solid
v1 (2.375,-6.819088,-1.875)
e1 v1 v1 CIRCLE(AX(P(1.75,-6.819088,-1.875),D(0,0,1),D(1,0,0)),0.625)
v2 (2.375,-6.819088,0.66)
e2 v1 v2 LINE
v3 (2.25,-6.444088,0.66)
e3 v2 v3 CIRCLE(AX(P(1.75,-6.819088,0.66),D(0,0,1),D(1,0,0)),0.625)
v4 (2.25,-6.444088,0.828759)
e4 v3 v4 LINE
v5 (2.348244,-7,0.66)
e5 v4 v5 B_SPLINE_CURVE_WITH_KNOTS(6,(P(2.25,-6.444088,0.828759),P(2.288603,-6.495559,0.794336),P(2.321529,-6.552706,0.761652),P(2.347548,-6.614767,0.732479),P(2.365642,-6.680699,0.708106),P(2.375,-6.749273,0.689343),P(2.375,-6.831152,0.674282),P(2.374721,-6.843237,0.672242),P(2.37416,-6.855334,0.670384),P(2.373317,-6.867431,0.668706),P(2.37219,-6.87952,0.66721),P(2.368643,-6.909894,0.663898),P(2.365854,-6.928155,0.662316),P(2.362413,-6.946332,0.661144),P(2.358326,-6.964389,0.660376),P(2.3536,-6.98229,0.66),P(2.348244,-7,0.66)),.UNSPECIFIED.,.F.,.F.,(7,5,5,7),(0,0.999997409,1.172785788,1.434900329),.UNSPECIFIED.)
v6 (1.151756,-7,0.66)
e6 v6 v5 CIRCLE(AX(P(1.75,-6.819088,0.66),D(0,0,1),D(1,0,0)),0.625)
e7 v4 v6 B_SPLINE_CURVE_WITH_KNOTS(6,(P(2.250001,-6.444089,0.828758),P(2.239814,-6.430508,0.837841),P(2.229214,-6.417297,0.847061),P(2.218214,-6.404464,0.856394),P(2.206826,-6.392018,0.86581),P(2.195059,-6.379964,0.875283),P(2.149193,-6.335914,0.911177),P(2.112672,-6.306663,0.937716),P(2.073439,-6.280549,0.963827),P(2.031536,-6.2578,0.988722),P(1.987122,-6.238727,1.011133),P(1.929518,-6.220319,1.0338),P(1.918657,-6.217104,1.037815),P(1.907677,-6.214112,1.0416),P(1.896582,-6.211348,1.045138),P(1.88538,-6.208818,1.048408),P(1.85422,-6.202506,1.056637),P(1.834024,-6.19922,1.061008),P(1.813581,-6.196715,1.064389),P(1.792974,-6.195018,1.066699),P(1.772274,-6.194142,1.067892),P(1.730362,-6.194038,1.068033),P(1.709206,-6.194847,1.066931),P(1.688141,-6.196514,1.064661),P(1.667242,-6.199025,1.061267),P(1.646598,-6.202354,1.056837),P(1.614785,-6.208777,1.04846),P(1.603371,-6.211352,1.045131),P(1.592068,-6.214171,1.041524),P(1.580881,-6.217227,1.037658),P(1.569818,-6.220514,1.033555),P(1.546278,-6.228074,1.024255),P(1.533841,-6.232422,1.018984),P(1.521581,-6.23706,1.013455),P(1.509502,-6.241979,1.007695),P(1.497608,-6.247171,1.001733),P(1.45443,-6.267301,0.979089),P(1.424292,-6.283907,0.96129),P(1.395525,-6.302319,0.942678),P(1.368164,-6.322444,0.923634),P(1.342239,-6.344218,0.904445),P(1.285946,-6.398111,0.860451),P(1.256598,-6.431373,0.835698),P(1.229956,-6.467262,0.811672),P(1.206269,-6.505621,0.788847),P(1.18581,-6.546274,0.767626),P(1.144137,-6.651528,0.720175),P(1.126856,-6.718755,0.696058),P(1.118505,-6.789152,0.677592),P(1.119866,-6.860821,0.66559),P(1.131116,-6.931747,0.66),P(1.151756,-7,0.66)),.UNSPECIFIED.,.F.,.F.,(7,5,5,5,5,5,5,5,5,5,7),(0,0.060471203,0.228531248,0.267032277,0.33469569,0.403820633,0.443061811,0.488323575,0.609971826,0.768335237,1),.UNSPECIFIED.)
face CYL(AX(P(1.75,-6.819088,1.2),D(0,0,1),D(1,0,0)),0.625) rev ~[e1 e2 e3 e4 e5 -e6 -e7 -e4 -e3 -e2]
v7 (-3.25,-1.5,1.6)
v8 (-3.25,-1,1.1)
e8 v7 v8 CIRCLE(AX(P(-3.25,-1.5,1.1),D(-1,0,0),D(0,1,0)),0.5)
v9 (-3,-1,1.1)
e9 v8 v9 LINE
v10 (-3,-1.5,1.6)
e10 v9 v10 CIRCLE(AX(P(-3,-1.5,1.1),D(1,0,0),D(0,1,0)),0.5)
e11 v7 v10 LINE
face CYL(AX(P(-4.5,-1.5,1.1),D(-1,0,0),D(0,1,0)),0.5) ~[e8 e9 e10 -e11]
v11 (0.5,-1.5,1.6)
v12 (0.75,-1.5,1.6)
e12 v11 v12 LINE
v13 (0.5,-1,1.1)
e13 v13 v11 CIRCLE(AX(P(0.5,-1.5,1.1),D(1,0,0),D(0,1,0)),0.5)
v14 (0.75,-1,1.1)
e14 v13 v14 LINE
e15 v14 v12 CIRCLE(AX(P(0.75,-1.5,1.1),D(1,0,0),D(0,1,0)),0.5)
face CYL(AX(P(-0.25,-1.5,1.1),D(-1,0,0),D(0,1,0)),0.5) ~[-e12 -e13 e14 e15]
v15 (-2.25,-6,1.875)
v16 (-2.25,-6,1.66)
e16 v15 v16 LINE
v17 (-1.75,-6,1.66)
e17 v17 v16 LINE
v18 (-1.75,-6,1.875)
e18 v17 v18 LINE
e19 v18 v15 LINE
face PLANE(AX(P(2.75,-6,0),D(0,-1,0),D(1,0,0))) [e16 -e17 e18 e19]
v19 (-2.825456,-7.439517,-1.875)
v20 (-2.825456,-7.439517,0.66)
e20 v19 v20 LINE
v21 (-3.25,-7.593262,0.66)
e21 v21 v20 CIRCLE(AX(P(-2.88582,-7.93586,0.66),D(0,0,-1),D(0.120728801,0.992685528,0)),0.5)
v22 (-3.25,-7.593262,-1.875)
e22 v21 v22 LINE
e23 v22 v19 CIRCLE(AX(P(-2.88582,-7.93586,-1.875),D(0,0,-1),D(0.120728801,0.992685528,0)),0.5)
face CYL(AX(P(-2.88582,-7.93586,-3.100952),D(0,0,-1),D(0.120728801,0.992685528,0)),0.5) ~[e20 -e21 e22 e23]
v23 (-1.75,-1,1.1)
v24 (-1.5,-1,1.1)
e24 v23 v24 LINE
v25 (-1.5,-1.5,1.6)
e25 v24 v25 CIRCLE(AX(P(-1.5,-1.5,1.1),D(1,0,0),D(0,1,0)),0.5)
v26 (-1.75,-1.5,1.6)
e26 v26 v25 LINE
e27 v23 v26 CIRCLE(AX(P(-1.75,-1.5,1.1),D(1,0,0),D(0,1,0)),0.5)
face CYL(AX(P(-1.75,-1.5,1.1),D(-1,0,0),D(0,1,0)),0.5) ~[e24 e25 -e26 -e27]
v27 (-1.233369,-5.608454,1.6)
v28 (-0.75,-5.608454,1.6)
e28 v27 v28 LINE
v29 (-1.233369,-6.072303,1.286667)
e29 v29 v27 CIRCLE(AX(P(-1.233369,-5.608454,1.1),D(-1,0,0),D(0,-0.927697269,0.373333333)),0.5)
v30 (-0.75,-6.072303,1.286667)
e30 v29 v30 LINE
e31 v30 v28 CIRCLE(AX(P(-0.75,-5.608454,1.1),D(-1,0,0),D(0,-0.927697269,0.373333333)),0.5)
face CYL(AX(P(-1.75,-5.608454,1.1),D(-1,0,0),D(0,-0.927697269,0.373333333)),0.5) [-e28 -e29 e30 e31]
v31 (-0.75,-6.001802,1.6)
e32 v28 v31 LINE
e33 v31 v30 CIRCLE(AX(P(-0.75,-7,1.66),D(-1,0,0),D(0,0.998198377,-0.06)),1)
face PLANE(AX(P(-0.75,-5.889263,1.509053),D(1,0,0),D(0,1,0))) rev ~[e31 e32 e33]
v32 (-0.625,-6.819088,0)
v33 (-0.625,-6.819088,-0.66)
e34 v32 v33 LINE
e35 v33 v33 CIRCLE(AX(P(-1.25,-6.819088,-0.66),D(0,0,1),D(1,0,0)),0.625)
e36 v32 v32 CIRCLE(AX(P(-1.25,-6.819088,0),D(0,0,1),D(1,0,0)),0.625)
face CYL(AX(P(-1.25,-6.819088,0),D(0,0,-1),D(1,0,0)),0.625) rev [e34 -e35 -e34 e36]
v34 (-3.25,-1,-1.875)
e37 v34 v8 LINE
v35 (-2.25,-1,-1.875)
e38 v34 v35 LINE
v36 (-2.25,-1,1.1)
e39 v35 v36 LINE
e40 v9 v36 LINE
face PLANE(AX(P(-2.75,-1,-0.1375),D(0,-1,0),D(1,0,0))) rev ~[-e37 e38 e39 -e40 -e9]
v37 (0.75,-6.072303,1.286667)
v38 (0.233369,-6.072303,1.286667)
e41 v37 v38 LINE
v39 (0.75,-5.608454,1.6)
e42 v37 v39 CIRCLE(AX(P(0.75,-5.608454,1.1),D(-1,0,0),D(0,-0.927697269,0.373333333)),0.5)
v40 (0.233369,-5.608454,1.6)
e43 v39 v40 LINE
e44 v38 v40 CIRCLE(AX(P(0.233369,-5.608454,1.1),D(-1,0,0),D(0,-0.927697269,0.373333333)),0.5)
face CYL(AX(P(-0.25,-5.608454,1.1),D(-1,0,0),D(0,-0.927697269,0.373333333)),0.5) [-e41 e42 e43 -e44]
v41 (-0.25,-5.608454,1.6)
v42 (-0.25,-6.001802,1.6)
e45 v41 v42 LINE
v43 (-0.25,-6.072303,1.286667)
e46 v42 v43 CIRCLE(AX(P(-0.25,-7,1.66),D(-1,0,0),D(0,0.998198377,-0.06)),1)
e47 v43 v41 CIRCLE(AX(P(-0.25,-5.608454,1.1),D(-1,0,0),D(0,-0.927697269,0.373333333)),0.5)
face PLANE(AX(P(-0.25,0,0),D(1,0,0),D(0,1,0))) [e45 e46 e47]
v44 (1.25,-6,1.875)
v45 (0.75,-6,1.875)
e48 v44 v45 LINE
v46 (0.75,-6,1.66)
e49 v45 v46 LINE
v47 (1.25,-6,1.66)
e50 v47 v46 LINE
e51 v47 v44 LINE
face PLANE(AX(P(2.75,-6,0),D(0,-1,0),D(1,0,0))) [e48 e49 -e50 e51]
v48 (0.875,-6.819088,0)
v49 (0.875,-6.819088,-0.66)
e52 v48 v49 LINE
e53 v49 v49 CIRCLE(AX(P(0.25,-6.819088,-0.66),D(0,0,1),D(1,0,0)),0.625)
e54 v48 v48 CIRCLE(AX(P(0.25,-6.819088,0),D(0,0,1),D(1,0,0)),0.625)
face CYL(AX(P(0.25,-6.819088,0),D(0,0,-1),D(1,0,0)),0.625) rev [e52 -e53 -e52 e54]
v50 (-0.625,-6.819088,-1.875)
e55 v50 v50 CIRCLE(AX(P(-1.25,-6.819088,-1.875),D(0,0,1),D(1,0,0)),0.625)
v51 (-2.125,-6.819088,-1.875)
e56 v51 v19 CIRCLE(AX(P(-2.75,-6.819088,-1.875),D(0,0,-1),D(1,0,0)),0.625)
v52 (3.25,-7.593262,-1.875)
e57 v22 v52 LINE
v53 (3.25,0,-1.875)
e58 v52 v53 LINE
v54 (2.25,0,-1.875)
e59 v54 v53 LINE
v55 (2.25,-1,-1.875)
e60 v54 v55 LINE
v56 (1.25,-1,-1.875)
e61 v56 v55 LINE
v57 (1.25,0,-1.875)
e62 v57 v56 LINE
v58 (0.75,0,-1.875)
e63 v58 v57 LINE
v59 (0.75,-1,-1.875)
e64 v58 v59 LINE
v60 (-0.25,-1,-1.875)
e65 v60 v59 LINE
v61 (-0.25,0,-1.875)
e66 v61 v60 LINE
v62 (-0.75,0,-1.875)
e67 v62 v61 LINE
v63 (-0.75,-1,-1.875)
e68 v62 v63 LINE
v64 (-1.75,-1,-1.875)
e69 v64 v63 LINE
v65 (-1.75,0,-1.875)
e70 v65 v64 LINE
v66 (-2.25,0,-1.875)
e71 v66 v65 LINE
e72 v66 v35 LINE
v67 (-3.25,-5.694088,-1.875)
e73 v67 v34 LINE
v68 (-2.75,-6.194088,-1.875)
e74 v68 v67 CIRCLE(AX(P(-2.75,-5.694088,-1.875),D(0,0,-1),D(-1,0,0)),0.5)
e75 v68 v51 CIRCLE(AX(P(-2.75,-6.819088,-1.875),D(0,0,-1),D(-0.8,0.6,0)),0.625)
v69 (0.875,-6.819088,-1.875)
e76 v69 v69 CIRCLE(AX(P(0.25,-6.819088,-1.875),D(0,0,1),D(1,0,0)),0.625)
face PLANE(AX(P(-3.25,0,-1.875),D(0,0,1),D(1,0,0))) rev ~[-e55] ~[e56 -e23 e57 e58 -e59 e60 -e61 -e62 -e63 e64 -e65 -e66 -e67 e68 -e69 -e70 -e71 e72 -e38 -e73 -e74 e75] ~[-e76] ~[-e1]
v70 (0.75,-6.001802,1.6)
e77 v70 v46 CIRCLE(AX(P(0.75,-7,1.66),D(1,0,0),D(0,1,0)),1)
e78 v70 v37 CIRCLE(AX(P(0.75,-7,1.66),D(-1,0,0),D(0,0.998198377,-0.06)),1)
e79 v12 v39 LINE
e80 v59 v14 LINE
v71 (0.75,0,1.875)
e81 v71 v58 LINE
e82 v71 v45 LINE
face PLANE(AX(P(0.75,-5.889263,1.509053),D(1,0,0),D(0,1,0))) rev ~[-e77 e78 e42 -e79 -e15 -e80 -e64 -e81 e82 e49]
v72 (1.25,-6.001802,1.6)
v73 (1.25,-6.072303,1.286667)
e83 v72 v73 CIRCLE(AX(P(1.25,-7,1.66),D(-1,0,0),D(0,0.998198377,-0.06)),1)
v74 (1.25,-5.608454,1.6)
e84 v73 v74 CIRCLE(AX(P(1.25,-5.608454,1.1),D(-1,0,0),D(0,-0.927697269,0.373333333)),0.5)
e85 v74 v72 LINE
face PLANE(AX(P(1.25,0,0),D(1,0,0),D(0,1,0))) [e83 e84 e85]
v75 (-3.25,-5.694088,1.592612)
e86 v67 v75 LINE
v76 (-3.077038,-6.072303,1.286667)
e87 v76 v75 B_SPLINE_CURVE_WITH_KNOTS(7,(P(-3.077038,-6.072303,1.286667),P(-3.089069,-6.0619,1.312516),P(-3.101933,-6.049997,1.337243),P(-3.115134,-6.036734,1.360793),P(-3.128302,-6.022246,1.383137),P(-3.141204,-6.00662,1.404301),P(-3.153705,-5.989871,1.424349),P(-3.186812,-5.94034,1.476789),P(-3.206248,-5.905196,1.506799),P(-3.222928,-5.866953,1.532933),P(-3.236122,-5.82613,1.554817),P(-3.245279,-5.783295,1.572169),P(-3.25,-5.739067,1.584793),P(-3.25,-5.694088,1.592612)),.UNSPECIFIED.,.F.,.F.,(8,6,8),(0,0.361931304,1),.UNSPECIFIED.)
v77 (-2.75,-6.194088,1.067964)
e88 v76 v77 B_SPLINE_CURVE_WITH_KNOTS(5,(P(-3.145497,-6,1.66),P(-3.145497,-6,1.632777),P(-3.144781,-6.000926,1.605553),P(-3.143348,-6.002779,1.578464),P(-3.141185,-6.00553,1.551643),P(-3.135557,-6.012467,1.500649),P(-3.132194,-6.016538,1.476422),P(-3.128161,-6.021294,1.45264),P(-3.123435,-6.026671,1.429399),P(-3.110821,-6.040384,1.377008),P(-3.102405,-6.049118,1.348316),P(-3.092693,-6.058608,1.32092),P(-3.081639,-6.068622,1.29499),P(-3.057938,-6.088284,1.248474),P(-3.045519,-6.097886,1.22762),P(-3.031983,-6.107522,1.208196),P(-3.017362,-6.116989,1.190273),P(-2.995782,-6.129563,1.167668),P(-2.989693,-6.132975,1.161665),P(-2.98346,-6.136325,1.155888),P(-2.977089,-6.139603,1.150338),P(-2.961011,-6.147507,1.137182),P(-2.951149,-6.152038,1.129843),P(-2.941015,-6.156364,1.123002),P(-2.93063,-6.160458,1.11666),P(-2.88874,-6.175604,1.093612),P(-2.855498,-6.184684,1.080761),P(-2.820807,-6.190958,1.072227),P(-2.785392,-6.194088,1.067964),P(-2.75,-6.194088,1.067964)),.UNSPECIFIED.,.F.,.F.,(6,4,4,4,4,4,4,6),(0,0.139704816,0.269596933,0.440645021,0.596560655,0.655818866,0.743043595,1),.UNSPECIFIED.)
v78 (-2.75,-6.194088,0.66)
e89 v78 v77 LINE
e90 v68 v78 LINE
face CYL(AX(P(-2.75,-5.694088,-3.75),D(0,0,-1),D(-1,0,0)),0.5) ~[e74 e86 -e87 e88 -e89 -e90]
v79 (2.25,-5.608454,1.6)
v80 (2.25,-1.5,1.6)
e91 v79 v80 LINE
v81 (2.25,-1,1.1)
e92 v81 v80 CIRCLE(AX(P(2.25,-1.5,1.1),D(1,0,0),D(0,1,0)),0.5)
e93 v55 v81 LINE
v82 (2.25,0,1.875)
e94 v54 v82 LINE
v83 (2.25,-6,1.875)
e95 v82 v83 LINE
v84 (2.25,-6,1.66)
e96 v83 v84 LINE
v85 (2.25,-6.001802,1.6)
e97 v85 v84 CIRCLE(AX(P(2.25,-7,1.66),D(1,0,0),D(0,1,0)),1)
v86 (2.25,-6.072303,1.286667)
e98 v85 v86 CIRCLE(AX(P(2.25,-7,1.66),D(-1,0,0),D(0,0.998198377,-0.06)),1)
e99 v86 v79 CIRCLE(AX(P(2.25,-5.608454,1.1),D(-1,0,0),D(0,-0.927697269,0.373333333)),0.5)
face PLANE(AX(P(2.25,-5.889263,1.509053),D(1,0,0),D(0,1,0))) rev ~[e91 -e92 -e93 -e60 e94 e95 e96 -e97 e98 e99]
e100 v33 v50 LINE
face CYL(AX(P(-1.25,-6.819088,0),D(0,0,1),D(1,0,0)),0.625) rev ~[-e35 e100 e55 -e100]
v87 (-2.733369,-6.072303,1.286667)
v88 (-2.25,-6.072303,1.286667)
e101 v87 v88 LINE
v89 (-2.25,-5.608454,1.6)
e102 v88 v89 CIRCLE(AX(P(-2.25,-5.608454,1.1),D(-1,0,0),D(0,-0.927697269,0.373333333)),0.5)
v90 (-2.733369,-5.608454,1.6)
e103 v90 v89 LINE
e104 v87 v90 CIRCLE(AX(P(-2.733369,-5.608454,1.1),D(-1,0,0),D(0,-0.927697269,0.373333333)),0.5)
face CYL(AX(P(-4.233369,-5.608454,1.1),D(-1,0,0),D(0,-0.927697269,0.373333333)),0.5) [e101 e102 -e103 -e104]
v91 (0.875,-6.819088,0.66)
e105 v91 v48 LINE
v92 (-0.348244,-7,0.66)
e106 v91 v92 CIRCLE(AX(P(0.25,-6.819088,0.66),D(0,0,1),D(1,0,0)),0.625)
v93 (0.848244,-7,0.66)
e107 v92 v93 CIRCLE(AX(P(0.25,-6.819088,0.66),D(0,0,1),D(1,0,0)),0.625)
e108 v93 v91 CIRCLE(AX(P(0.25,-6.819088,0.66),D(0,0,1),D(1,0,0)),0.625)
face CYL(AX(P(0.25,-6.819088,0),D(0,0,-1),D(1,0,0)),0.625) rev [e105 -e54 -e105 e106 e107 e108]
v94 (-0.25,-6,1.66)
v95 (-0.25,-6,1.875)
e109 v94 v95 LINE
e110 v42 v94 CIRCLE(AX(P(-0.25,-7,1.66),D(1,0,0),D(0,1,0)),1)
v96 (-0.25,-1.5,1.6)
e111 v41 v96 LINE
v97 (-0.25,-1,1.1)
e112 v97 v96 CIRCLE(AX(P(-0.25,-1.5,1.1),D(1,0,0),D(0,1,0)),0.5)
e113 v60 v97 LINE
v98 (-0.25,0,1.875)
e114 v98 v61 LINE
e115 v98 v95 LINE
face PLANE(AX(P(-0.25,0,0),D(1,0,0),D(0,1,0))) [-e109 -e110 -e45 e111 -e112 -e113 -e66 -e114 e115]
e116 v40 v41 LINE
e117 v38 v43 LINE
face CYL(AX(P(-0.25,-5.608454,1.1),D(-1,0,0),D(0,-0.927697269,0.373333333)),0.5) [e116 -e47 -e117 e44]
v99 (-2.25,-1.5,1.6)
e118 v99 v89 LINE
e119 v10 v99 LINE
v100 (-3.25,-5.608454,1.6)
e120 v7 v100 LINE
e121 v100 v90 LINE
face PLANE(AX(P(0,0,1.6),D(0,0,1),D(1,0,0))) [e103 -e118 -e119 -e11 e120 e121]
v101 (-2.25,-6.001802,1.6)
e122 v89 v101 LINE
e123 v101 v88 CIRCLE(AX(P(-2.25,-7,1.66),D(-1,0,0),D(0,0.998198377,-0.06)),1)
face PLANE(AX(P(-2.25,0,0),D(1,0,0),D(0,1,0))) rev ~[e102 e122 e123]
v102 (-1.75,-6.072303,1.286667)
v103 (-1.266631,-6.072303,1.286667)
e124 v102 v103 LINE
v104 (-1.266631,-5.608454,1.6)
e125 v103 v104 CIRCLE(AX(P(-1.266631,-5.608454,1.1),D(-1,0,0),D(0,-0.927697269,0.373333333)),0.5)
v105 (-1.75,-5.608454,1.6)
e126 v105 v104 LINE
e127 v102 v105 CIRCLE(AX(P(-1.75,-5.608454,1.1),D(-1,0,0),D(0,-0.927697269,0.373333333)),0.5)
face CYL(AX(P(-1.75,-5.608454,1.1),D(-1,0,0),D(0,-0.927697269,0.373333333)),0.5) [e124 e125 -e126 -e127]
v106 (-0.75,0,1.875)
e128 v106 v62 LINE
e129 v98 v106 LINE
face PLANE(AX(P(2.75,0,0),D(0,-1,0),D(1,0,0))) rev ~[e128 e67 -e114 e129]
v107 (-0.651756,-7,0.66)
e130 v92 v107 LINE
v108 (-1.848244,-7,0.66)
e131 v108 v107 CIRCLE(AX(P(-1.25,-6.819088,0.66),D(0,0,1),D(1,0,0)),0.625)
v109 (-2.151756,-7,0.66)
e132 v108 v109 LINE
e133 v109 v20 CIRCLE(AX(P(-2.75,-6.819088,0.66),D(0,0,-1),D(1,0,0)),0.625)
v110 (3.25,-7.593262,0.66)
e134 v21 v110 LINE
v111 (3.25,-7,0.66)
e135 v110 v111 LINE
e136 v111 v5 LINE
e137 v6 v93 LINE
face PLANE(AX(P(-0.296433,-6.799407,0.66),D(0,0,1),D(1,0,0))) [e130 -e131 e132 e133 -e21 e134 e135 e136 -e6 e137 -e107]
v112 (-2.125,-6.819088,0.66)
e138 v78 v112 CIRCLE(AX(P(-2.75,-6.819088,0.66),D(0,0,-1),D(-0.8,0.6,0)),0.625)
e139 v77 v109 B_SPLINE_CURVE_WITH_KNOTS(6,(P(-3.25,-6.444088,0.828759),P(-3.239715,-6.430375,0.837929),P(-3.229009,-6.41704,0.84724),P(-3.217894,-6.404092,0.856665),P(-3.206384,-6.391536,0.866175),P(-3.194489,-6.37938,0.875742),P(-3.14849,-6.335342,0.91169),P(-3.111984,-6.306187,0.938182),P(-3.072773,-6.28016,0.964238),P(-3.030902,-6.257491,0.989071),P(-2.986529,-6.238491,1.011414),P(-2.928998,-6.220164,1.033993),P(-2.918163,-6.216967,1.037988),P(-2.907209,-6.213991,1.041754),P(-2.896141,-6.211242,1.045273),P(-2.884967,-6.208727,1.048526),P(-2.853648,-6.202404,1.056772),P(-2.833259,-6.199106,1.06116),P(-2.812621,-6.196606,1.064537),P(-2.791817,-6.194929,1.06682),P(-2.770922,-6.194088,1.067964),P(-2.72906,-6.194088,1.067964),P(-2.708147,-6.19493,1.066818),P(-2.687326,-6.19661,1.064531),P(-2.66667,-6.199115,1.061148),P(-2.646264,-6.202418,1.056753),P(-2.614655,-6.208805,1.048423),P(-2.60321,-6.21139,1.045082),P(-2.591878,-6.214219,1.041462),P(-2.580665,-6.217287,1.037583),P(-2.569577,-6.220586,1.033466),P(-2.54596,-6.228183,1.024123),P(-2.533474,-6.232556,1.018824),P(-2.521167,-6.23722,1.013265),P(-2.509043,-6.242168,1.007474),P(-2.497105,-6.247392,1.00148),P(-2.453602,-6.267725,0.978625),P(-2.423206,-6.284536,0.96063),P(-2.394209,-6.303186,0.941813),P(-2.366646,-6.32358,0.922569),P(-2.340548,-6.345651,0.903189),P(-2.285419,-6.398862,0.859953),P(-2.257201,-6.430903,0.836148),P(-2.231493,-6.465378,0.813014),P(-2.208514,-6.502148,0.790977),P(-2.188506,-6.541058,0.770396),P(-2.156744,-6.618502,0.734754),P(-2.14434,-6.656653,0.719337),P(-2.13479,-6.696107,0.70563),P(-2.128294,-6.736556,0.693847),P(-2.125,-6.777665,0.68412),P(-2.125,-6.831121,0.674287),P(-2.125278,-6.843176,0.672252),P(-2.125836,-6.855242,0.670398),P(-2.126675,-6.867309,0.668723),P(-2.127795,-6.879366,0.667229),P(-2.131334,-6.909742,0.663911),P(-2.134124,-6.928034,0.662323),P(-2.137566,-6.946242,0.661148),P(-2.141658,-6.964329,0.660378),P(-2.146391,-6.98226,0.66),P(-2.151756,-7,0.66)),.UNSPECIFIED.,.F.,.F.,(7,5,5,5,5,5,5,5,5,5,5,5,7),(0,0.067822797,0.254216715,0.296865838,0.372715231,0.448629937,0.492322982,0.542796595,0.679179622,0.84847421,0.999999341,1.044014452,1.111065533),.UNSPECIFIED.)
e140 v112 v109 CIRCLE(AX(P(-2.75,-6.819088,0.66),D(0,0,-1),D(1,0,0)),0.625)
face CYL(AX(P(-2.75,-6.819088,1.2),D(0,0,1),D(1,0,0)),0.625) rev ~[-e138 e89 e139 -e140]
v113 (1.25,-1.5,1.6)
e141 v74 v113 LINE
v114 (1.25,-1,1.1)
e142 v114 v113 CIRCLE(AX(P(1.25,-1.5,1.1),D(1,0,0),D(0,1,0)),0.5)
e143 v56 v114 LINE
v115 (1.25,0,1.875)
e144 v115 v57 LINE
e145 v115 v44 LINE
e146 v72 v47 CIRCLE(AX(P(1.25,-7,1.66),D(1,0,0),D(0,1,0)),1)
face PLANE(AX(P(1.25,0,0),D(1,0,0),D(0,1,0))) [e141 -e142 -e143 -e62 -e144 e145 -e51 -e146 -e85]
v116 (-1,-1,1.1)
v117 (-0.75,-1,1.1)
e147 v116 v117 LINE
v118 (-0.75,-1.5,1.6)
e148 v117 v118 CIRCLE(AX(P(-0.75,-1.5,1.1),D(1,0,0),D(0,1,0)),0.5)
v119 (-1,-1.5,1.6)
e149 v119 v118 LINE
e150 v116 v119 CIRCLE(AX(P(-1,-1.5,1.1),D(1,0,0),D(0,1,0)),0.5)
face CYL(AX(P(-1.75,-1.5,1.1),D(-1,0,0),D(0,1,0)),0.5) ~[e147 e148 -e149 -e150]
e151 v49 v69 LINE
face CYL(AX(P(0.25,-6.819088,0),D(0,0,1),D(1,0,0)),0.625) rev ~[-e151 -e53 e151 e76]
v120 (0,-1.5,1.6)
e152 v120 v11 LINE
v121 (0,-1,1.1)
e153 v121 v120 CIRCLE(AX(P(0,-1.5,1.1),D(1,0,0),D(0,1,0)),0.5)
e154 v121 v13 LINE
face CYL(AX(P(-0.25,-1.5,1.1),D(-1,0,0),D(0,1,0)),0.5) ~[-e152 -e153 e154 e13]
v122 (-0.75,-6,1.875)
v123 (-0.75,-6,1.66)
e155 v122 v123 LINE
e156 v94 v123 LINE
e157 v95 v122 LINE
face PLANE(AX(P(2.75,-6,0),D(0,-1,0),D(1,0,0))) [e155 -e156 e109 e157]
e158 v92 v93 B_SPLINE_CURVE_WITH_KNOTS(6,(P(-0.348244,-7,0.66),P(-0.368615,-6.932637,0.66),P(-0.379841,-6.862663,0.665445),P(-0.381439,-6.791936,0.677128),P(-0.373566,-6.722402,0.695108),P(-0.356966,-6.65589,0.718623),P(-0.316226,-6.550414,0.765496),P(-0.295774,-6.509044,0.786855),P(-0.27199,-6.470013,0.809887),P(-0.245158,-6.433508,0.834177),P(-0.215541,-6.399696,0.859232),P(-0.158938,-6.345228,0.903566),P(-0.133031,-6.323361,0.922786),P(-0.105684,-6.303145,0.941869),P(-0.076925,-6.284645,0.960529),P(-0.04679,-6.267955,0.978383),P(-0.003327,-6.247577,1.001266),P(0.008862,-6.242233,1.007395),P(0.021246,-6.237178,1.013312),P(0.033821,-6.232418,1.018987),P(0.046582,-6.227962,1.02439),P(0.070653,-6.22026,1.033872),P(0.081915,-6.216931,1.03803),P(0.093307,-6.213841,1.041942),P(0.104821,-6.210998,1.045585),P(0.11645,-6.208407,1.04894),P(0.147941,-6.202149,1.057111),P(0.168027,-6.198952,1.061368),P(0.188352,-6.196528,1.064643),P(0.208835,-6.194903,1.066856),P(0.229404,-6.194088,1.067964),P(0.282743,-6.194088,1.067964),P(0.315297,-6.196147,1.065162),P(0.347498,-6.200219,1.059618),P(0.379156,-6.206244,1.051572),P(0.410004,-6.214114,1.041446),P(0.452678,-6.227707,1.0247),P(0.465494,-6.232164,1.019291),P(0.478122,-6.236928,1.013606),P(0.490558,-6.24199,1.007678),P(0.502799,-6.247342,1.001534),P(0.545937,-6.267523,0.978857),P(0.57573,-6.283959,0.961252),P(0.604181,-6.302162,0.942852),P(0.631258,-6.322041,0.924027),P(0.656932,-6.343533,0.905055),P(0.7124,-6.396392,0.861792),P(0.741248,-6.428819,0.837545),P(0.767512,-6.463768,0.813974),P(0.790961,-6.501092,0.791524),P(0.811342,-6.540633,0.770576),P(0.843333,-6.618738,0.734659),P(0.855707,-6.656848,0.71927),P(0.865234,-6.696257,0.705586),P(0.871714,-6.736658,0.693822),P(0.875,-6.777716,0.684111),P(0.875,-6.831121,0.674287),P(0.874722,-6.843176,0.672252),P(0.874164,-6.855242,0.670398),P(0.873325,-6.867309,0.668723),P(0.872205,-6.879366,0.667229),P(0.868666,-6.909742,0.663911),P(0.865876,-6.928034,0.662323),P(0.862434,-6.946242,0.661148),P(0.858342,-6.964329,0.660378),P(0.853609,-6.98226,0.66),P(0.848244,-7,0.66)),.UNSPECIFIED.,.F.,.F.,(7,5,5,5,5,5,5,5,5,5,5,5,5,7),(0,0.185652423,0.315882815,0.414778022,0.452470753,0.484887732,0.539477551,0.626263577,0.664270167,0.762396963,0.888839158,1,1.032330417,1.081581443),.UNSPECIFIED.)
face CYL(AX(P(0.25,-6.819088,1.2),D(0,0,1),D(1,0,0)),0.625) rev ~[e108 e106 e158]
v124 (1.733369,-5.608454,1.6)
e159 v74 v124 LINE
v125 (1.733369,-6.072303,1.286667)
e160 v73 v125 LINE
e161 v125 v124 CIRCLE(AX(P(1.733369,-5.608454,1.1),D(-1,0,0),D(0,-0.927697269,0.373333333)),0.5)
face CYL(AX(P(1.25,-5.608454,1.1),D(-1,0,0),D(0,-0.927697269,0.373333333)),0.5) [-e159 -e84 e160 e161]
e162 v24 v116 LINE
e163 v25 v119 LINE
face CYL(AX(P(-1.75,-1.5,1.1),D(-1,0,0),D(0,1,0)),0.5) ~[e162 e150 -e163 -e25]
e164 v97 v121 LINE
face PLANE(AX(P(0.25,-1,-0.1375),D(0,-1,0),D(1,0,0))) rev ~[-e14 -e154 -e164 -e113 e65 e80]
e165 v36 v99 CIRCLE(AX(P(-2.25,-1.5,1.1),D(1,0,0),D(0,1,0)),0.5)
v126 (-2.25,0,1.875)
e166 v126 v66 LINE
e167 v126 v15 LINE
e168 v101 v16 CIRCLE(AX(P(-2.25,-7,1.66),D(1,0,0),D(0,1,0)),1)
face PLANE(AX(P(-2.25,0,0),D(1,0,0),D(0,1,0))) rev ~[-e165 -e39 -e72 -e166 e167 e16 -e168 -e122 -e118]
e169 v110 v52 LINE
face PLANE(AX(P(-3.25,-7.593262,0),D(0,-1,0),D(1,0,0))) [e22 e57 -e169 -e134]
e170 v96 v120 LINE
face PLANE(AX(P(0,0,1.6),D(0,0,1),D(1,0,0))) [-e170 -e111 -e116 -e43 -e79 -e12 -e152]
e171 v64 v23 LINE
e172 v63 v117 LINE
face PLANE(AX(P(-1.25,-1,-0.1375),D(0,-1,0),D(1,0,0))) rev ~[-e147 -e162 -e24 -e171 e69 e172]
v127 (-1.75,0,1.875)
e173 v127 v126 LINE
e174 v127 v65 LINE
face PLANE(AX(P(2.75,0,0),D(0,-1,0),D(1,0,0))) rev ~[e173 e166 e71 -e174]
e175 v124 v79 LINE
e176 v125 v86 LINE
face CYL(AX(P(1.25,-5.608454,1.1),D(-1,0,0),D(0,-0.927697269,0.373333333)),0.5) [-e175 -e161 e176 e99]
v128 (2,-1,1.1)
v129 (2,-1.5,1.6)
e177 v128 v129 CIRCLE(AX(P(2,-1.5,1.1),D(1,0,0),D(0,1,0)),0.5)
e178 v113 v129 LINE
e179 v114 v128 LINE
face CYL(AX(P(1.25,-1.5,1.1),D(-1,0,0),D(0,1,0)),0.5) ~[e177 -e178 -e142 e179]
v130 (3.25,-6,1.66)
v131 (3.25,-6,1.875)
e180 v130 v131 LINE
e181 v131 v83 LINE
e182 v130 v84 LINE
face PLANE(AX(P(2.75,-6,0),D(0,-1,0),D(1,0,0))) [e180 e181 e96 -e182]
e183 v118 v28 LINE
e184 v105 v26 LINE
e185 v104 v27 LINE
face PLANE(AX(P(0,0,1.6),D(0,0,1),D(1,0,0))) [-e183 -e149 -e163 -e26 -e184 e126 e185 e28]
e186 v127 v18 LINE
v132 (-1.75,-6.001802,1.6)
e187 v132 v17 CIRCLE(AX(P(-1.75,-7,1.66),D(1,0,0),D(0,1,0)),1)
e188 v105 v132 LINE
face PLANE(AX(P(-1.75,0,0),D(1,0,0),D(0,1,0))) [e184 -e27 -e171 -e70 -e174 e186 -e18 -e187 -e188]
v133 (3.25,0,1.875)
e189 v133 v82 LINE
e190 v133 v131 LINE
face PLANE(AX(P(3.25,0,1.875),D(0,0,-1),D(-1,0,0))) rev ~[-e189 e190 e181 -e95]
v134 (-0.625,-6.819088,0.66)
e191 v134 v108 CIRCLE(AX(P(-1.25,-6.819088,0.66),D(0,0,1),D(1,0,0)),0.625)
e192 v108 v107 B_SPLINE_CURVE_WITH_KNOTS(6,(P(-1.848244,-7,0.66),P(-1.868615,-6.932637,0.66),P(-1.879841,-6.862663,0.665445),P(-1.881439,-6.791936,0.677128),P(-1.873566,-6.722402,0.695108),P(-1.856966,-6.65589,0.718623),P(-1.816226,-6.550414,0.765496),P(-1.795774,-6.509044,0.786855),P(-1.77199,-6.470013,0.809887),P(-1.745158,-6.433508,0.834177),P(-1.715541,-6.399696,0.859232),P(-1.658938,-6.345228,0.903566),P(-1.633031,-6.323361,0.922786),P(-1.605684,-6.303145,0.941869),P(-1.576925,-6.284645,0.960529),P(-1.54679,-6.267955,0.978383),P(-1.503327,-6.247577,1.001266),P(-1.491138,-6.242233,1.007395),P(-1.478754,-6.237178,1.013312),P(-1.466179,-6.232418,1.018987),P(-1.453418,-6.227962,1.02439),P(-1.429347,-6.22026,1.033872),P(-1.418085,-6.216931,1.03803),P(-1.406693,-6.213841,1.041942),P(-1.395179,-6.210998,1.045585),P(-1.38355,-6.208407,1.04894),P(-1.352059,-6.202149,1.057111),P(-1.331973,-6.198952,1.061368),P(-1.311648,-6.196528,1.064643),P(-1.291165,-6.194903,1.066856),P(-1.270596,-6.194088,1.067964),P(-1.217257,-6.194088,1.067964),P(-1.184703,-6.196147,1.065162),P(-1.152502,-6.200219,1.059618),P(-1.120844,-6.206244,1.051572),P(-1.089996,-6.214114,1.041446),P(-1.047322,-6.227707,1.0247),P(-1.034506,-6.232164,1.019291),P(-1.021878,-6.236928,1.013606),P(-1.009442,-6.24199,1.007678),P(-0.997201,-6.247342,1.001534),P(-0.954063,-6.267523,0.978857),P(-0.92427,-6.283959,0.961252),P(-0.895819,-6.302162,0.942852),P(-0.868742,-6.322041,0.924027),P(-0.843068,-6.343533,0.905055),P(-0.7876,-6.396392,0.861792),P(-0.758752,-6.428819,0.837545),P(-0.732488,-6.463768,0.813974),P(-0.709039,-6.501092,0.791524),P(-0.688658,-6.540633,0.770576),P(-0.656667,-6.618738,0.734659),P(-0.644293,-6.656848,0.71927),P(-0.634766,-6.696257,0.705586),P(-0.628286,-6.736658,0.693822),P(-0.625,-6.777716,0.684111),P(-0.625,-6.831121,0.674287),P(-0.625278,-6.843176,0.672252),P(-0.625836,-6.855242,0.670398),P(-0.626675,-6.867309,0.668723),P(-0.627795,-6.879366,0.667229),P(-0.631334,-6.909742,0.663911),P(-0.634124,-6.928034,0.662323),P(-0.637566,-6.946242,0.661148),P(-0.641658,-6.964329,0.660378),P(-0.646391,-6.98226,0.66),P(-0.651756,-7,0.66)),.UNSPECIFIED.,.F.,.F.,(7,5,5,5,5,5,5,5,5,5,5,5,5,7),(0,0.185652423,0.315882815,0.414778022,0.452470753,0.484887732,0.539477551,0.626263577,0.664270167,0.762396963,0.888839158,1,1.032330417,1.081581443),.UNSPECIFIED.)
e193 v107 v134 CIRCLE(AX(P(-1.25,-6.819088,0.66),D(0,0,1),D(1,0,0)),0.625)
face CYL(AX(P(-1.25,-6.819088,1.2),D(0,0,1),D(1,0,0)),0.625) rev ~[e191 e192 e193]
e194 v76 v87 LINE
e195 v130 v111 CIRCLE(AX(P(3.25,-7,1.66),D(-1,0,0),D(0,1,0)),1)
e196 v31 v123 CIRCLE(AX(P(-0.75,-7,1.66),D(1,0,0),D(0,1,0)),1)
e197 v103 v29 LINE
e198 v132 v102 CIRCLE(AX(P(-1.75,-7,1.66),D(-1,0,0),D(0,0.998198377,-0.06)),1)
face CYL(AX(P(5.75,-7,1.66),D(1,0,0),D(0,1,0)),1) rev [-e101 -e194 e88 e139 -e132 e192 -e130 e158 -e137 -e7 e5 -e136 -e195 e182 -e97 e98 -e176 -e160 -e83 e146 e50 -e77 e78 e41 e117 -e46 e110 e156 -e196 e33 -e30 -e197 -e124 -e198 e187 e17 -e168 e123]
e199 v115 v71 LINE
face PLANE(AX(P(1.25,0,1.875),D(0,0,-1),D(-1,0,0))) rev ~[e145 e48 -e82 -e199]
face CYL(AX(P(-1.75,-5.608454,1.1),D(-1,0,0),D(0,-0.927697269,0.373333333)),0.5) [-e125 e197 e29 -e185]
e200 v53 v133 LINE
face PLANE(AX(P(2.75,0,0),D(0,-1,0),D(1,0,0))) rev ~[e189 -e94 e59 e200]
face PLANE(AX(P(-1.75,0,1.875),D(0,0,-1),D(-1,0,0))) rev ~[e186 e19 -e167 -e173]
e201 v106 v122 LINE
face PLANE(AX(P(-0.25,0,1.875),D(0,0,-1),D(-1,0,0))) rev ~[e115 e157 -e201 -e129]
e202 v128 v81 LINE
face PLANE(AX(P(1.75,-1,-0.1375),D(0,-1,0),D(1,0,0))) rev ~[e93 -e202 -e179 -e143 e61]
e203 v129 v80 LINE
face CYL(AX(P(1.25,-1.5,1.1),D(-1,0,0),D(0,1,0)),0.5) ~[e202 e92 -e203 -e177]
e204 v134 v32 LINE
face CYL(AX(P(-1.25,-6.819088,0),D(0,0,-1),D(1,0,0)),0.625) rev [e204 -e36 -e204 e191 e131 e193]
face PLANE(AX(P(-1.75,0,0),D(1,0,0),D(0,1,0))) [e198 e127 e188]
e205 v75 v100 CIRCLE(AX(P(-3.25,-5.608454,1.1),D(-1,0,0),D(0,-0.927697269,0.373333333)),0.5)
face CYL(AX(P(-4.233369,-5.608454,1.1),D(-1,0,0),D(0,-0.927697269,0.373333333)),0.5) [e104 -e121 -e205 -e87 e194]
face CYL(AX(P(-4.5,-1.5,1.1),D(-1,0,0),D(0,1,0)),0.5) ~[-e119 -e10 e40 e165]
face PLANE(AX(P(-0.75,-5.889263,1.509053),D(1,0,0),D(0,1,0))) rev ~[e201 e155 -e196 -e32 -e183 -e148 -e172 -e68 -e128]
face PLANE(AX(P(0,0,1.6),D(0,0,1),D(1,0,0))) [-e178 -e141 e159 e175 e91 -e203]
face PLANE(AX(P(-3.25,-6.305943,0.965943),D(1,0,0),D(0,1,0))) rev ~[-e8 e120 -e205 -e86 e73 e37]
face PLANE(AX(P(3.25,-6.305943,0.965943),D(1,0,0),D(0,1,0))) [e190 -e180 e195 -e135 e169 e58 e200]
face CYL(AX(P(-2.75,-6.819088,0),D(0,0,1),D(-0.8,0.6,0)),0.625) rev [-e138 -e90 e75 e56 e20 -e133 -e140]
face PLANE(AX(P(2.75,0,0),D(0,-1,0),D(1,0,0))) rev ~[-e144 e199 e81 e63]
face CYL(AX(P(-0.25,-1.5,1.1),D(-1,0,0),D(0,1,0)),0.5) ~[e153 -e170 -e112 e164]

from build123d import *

# Parameters (mm, degrees)
F0_W         = 1
F0_H         = 3.475
F1_DEPTH     = 6
F2_DEPTH     = 1
F3_R         = 0.625
F4_DEPTH     = 0.66
F5_DEPTH     = 1.875
F6_T4_DEPTH  = 9
F6_S6_R      = 0.625
F6_T7_DEPTH  = 6
F6_T11_DEPTH = 9
F6_S14_R     = 0.625
F6_T15_DEPTH = 6
F6_S16_R     = 0.625
F6_T17_DEPTH = 6
F6_S18_R     = 0.625
F6_T19_DEPTH = 6
F6_S20_R     = 0.625
F6_T21_DEPTH = 6
F6_T25_DEPTH = 11.5
F6_T32_DEPTH = 11.5
F6_T39_DEPTH = 11.5
F7_T1_DEPTH  = 6.4537585313
F7_T3_DEPTH  = 4.9869031288
F7_T5_DEPTH  = 1
F7_T7_DEPTH  = 1
F7_T9_DEPTH  = 1
F7_T11_DEPTH = 2.25
F7_T13_DEPTH = 1.9833688147
F7_T18_DEPTH = 3.5
F7_T23_DEPTH = 3.5
F7_T28_DEPTH = 3.5
F7_T33_DEPTH = 3.5
F7_T38_DEPTH = 3.5
F7_T43_DEPTH = 3.5
F7_T48_DEPTH = 2.9667376294
F7_T53_DEPTH = 2.9667376294
F7_T58_DEPTH = 2.9667376294
F7_T63_DEPTH = 2.9667376294
F7_T68_DEPTH = 2.9667376294
F7_T73_DEPTH = 2.9667376294


# Not quite as in the source:
# - a fillet or chamfer that OpenCascade refuses, or shapes differently, is made with other operations: its cross-section is extruded or revolved along the edge and cut away or added


with BuildPart() as f1:
    # F0 (on Front) → F1 (new body)
    with BuildSketch(Plane.XZ):
        Polygon((2.25, -1.875), (3.25, -1.875), (3.25, 1.875), (2.25, 1.875), (2.25, 1.6), align=None)
        with Locations((1.75, -0.1375)):
            Rectangle(F0_W, F0_H)
        Polygon((0.75, -1.875), (1.25, -1.875), (1.25, 1.6), (1.25, 1.875), (0.75, 1.875), (0.75, 1.6), align=None)
        with Locations((0.25, -0.1375)):
            Rectangle(F0_W, F0_H)
        Polygon((-0.75, -1.875), (-0.25, -1.875), (-0.25, 1.6), (-0.25, 1.875), (-0.75, 1.875), (-0.75, 1.6), align=None)
        with Locations((-1.25, -0.1375)):
            Rectangle(F0_W, F0_H)
        Polygon((-2.25, -1.875), (-1.75, -1.875), (-1.75, 1.6), (-1.75, 1.875), (-2.25, 1.875), (-2.25, 1.6), align=None)
        with Locations((-2.75, -0.1375)):
            Rectangle(F0_W, F0_H)
    extrude(amount=F1_DEPTH)

    # F0 (on Front) → F2 (cut)
    with BuildSketch(Plane.XZ):
        with Locations((1.75, -0.1375)):
            Rectangle(F0_W, F0_H)
        with Locations((0.25, -0.1375)):
            Rectangle(F0_W, F0_H)
        with Locations((-1.25, -0.1375)):
            Rectangle(F0_W, F0_H)
        with Locations((-2.75, -0.1375)):
            Rectangle(F0_W, F0_H)
    extrude(amount=F2_DEPTH, mode=Mode.SUBTRACT)

    # F3 (on Top) → F4 (join, symmetric)
    with BuildSketch(Plane.XY):
        with BuildLine():
            Line((3.25, -6), (-3.25, -6))
            Line((-3.25, -6), (-3.25, -6.4440884776))
            ThreePointArc((-3.25, -6.4440884776), (-2.5523576462, -6.2261614164), (-2.125, -6.8190884776))
            ThreePointArc((-2.125, -6.8190884776), (-2.5523576462, -7.4120155389), (-3.25, -7.1940884776))
            Line((-3.25, -7.1940884776), (-3.25, -7.593262475))
            Line((-3.25, -7.593262475), (3.25, -7.593262475))
            Line((3.25, -7.593262475), (3.25, -6))
        make_face()
        with Locations((-1.25, -6.8190884776)):
            Circle(F3_R, mode=Mode.SUBTRACT)
        with Locations((0.25, -6.8190884776)):
            Circle(F3_R, mode=Mode.SUBTRACT)
        with Locations((1.75, -6.8190884776)):
            Circle(F3_R, mode=Mode.SUBTRACT)
    extrude(amount=F4_DEPTH, both=True)

    # F3 (on Top) → F5 (join)
    with BuildSketch(Plane.XY):
        with BuildLine():
            Line((3.25, -6), (-3.25, -6))
            Line((-3.25, -6), (-3.25, -6.4440884776))
            ThreePointArc((-3.25, -6.4440884776), (-2.5523576462, -6.2261614164), (-2.125, -6.8190884776))
            ThreePointArc((-2.125, -6.8190884776), (-2.5523576462, -7.4120155389), (-3.25, -7.1940884776))
            Line((-3.25, -7.1940884776), (-3.25, -7.593262475))
            Line((-3.25, -7.593262475), (3.25, -7.593262475))
            Line((3.25, -7.593262475), (3.25, -6))
        make_face()
        with Locations((-1.25, -6.8190884776)):
            Circle(F3_R, mode=Mode.SUBTRACT)
        with Locations((0.25, -6.8190884776)):
            Circle(F3_R, mode=Mode.SUBTRACT)
        with Locations((1.75, -6.8190884776)):
            Circle(F3_R, mode=Mode.SUBTRACT)
    extrude(amount=-F5_DEPTH)

    # F6: fillet of radius 1 on 1 edges, made by hand


with BuildPart() as f6_tool2:
    # F6_s3 → F6_t4 (new body)
    with BuildSketch(Plane.YZ.offset(3.25)):
        with BuildLine():
            ThreePointArc((-6, 1.66), (-6.2928932188, 0.9528932188), (-7, 0.66))
            Line((-7, 0.66), (-6, 0.66))
            Line((-6, 0.66), (-6, 1.66))
        make_face()
    extrude(amount=-F6_T4_DEPTH)

    split(bisect_by=Plane.YZ.offset(2.25), keep=Keep.TOP)

    # F6_s6 → F6_t7 (cut, symmetric)
    with BuildSketch(Plane.XY.offset(1.2)):
        with Locations((1.75, -6.8190884776)):
            Circle(F6_S6_R)
    extrude(amount=F6_T7_DEPTH, both=True, mode=Mode.SUBTRACT)


with BuildPart() as f1_1:
    add(f1.part)

    # F6_t1: union F6_tool2
    add(f6_tool2.part)


with BuildPart() as f6_tool9:
    # F6_s10 → F6_t11 (new body)
    with BuildSketch(Plane.YZ.offset(5.75)):
        with BuildLine():
            ThreePointArc((-6, 1.66), (-6.2928932188, 0.9528932188), (-7, 0.66))
            Line((-7, 0.66), (-6, 0.66))
            Line((-6, 0.66), (-6, 1.66))
        make_face()
    extrude(amount=-F6_T11_DEPTH)

    split(bisect_by=Plane.YZ.offset(2.25), keep=Keep.BOTTOM)

    split(bisect_by=Plane.XY.offset(1.6), keep=Keep.BOTTOM)

    # F6_s14 → F6_t15 (cut, symmetric)
    with BuildSketch(Plane.XY.offset(1.2)):
        with Locations((-2.75, -6.8190884776)):
            Circle(F6_S14_R)
    extrude(amount=F6_T15_DEPTH, both=True, mode=Mode.SUBTRACT)

    # F6_s16 → F6_t17 (cut, symmetric)
    with BuildSketch(Plane.XY.offset(1.2)):
        with Locations((1.75, -6.8190884776)):
            Circle(F6_S16_R)
    extrude(amount=F6_T17_DEPTH, both=True, mode=Mode.SUBTRACT)

    # F6_s18 → F6_t19 (cut, symmetric)
    with BuildSketch(Plane.XY.offset(1.2)):
        with Locations((0.25, -6.8190884776)):
            Circle(F6_S18_R)
    extrude(amount=F6_T19_DEPTH, both=True, mode=Mode.SUBTRACT)

    # F6_s20 → F6_t21 (cut, symmetric)
    with BuildSketch(Plane.XY.offset(1.2)):
        with Locations((-1.25, -6.8190884776)):
            Circle(F6_S20_R)
    extrude(amount=F6_T21_DEPTH, both=True, mode=Mode.SUBTRACT)


with BuildPart() as f1_2:
    add(f1_1.part)

    # F6_t8: union F6_tool9
    add(f6_tool9.part)


with BuildPart() as f6_tool23:
    # F6_s24 → F6_t25 (new body)
    with BuildSketch(Plane.YZ.offset(5.75)):
        with BuildLine():
            ThreePointArc((-6, 1.66), (-6.2928932188, 0.9528932188), (-7, 0.66))
            Line((-7, 0.66), (-6, 0.66))
            Line((-6, 0.66), (-6, 1.66))
        make_face()
    extrude(amount=-F6_T25_DEPTH)

    split(bisect_by=Plane.XY.offset(1.6), keep=Keep.TOP)

    split(bisect_by=Plane.YZ.offset(1.25), keep=Keep.BOTTOM)

    split(bisect_by=Plane.YZ.offset(0.75), keep=Keep.TOP)


with BuildPart() as f1_3:
    add(f1_2.part)

    # F6_t22: union F6_tool23
    add(f6_tool23.part)


with BuildPart() as f6_tool30:
    # F6_s31 → F6_t32 (new body)
    with BuildSketch(Plane.YZ.offset(5.75)):
        with BuildLine():
            ThreePointArc((-6, 1.66), (-6.2928932188, 0.9528932188), (-7, 0.66))
            Line((-7, 0.66), (-6, 0.66))
            Line((-6, 0.66), (-6, 1.66))
        make_face()
    extrude(amount=-F6_T32_DEPTH)

    split(bisect_by=Plane.XY.offset(1.6), keep=Keep.TOP)

    split(bisect_by=Plane.YZ.offset(-0.25), keep=Keep.BOTTOM)

    split(bisect_by=Plane.YZ.offset(-0.75), keep=Keep.TOP)


with BuildPart() as f1_4:
    add(f1_3.part)

    # F6_t29: union F6_tool30
    add(f6_tool30.part)


with BuildPart() as f6_tool37:
    # F6_s38 → F6_t39 (new body)
    with BuildSketch(Plane.YZ.offset(5.75)):
        with BuildLine():
            ThreePointArc((-6, 1.66), (-6.2928932188, 0.9528932188), (-7, 0.66))
            Line((-7, 0.66), (-6, 0.66))
            Line((-6, 0.66), (-6, 1.66))
        make_face()
    extrude(amount=-F6_T39_DEPTH)

    split(bisect_by=Plane.XY.offset(1.6), keep=Keep.TOP)

    split(bisect_by=Plane.YZ.offset(-1.75), keep=Keep.BOTTOM)

    split(bisect_by=Plane.YZ.offset(-2.25), keep=Keep.TOP)


with BuildPart() as f1_5:
    add(f1_4.part)

    # F6_t36: union F6_tool37
    add(f6_tool37.part)

    # F7: fillet of radius 0.5 on 10 edges, made by hand

    # F7_s2 → F7_t1 (cut)
    with BuildSketch(Plane.XY.offset(-3.75)):
        with BuildLine():
            ThreePointArc((-3.25, -5.6940884776), (-3.1035533906, -6.0476418682), (-2.75, -6.1940884776))
            ThreePointArc((-2.75, -6.1940884776), (-3.0295084972, -6.2600714833), (-3.25, -6.4440884776))
            Line((-3.25, -6.4440884776), (-3.25, -5.6940884776))
        make_face()
    extrude(amount=F7_T1_DEPTH, mode=Mode.SUBTRACT)

    # F7_s4 → F7_t3 (cut)
    with BuildSketch(Plane.XY.offset(-3.1009515644)):
        with BuildLine():
            ThreePointArc((-2.8254555009, -7.4395169323), (-3.0560709442, -7.4657378156), (-3.25, -7.593262475))
            Line((-3.25, -7.593262475), (-3.25, -7.1940884776))
            ThreePointArc((-3.25, -7.1940884776), (-3.0628035165, -7.3601790061), (-2.8254555009, -7.4395169323))
        make_face()
    extrude(amount=F7_T3_DEPTH, mode=Mode.SUBTRACT)

    # F7_s6 → F7_t5 (cut)
    with BuildSketch(Plane.YZ.offset(1.25)):
        with BuildLine():
            ThreePointArc((-1, 1.1), (-1.1464466094, 1.4535533906), (-1.5, 1.6))
            Line((-1.5, 1.6), (-1, 1.6))
            Line((-1, 1.6), (-1, 1.1))
        make_face()
        with BuildLine():
            ThreePointArc((-6.0723027314, 1.2866666667), (-5.8883350241, 1.5143267632), (-5.608454097, 1.6))
            Line((-5.608454097, 1.6), (-6.0018016229, 1.6))
            ThreePointArc((-6.0018016229, 1.6), (-6.024390983, 1.4404845199), (-6.0723027314, 1.2866666667))
        make_face()
    extrude(amount=F7_T5_DEPTH, mode=Mode.SUBTRACT)

    # F7_s8 → F7_t7 (cut)
    with BuildSketch(Plane.YZ.offset(-0.25)):
        with BuildLine():
            ThreePointArc((-1, 1.1), (-1.1464466094, 1.4535533906), (-1.5, 1.6))
            Line((-1.5, 1.6), (-1, 1.6))
            Line((-1, 1.6), (-1, 1.1))
        make_face()
        with BuildLine():
            ThreePointArc((-6.0723027314, 1.2866666667), (-5.8883350241, 1.5143267632), (-5.608454097, 1.6))
            Line((-5.608454097, 1.6), (-6.0018016229, 1.6))
            ThreePointArc((-6.0018016229, 1.6), (-6.024390983, 1.4404845199), (-6.0723027314, 1.2866666667))
        make_face()
    extrude(amount=F7_T7_DEPTH, mode=Mode.SUBTRACT)

    # F7_s10 → F7_t9 (cut)
    with BuildSketch(Plane.YZ.offset(-1.75)):
        with BuildLine():
            ThreePointArc((-1, 1.1), (-1.1464466094, 1.4535533906), (-1.5, 1.6))
            Line((-1.5, 1.6), (-1, 1.6))
            Line((-1, 1.6), (-1, 1.1))
        make_face()
        with BuildLine():
            ThreePointArc((-6.0723027314, 1.2866666667), (-5.8883350241, 1.5143267632), (-5.608454097, 1.6))
            Line((-5.608454097, 1.6), (-6.0018016229, 1.6))
            ThreePointArc((-6.0018016229, 1.6), (-6.024390983, 1.4404845199), (-6.0723027314, 1.2866666667))
        make_face()
    extrude(amount=F7_T9_DEPTH, mode=Mode.SUBTRACT)

    # F7_s12 → F7_t11 (cut)
    with BuildSketch(Plane.YZ.offset(-4.5)):
        with BuildLine():
            ThreePointArc((-1, 1.1), (-1.1464466094, 1.4535533906), (-1.5, 1.6))
            Line((-1.5, 1.6), (-1, 1.6))
            Line((-1, 1.6), (-1, 1.1))
        make_face()
    extrude(amount=F7_T11_DEPTH, mode=Mode.SUBTRACT)

    # F7_s14 → F7_t13 (cut)
    with BuildSketch(Plane.YZ.offset(-4.2333688147)):
        with BuildLine():
            ThreePointArc((-6.0723027314, 1.2866666667), (-5.8883350241, 1.5143267632), (-5.608454097, 1.6))
            Line((-5.608454097, 1.6), (-6.0018016229, 1.6))
            ThreePointArc((-6.0018016229, 1.6), (-6.024390983, 1.4404845199), (-6.0723027314, 1.2866666667))
        make_face()
    extrude(amount=F7_T13_DEPTH, mode=Mode.SUBTRACT)


with BuildPart() as f7_tool16:
    # F7_s17 → F7_t18 (new body)
    with BuildSketch(Plane.YZ.offset(3.5)):
        with BuildLine():
            ThreePointArc((-1, 1.1), (-1.1464466094, 1.4535533906), (-1.5, 1.6))
            Line((-1.5, 1.6), (-1, 1.6))
            Line((-1, 1.6), (-1, 1.1))
        make_face()
    extrude(amount=-F7_T18_DEPTH)

    split(bisect_by=Plane.YZ.offset(0.75), keep=Keep.BOTTOM)


with BuildPart() as f1_6:
    add(f1_5.part)

    # F7_t15: cut F7_tool16
    add(f7_tool16.part, mode=Mode.SUBTRACT)


with BuildPart() as f7_tool21:
    # F7_s22 → F7_t23 (new body)
    with BuildSketch(Plane.YZ.offset(2)):
        with BuildLine():
            ThreePointArc((-1, 1.1), (-1.1464466094, 1.4535533906), (-1.5, 1.6))
            Line((-1.5, 1.6), (-1, 1.6))
            Line((-1, 1.6), (-1, 1.1))
        make_face()
    extrude(amount=-F7_T23_DEPTH)

    split(bisect_by=Plane.YZ.offset(1.25), keep=Keep.TOP)


with BuildPart() as f1_7:
    add(f1_6.part)

    # F7_t20: cut F7_tool21
    add(f7_tool21.part, mode=Mode.SUBTRACT)


with BuildPart() as f7_tool26:
    # F7_s27 → F7_t28 (new body)
    with BuildSketch(Plane.YZ.offset(2)):
        with BuildLine():
            ThreePointArc((-1, 1.1), (-1.1464466094, 1.4535533906), (-1.5, 1.6))
            Line((-1.5, 1.6), (-1, 1.6))
            Line((-1, 1.6), (-1, 1.1))
        make_face()
    extrude(amount=-F7_T28_DEPTH)

    split(bisect_by=Plane.YZ.offset(-0.75), keep=Keep.BOTTOM)


with BuildPart() as f1_8:
    add(f1_7.part)

    # F7_t25: cut F7_tool26
    add(f7_tool26.part, mode=Mode.SUBTRACT)


with BuildPart() as f7_tool31:
    # F7_s32 → F7_t33 (new body)
    with BuildSketch(Plane.YZ.offset(0.5)):
        with BuildLine():
            ThreePointArc((-1, 1.1), (-1.1464466094, 1.4535533906), (-1.5, 1.6))
            Line((-1.5, 1.6), (-1, 1.6))
            Line((-1, 1.6), (-1, 1.1))
        make_face()
    extrude(amount=-F7_T33_DEPTH)

    split(bisect_by=Plane.YZ.offset(-0.25), keep=Keep.TOP)


with BuildPart() as f1_9:
    add(f1_8.part)

    # F7_t30: cut F7_tool31
    add(f7_tool31.part, mode=Mode.SUBTRACT)


with BuildPart() as f7_tool36:
    # F7_s37 → F7_t38 (new body)
    with BuildSketch(Plane.YZ.offset(0.5)):
        with BuildLine():
            ThreePointArc((-1, 1.1), (-1.1464466094, 1.4535533906), (-1.5, 1.6))
            Line((-1.5, 1.6), (-1, 1.6))
            Line((-1, 1.6), (-1, 1.1))
        make_face()
    extrude(amount=-F7_T38_DEPTH)

    split(bisect_by=Plane.YZ.offset(-2.25), keep=Keep.BOTTOM)


with BuildPart() as f1_10:
    add(f1_9.part)

    # F7_t35: cut F7_tool36
    add(f7_tool36.part, mode=Mode.SUBTRACT)


with BuildPart() as f7_tool41:
    # F7_s42 → F7_t43 (new body)
    with BuildSketch(Plane.YZ.offset(-1)):
        with BuildLine():
            ThreePointArc((-1, 1.1), (-1.1464466094, 1.4535533906), (-1.5, 1.6))
            Line((-1.5, 1.6), (-1, 1.6))
            Line((-1, 1.6), (-1, 1.1))
        make_face()
    extrude(amount=-F7_T43_DEPTH)

    split(bisect_by=Plane.YZ.offset(-1.75), keep=Keep.TOP)


with BuildPart() as f1_11:
    add(f1_10.part)

    # F7_t40: cut F7_tool41
    add(f7_tool41.part, mode=Mode.SUBTRACT)


with BuildPart() as f7_tool46:
    # F7_s47 → F7_t48 (new body)
    with BuildSketch(Plane.YZ.offset(0.2666311853)):
        with BuildLine():
            ThreePointArc((-6.0723027314, 1.2866666667), (-5.8883350241, 1.5143267632), (-5.608454097, 1.6))
            Line((-5.608454097, 1.6), (-6.0018016229, 1.6))
            ThreePointArc((-6.0018016229, 1.6), (-6.024390983, 1.4404845199), (-6.0723027314, 1.2866666667))
        make_face()
    extrude(amount=F7_T48_DEPTH)

    split(bisect_by=Plane.YZ.offset(0.75), keep=Keep.BOTTOM)


with BuildPart() as f1_12:
    add(f1_11.part)

    # F7_t45: cut F7_tool46
    add(f7_tool46.part, mode=Mode.SUBTRACT)


with BuildPart() as f7_tool51:
    # F7_s52 → F7_t53 (new body)
    with BuildSketch(Plane.YZ.offset(-1.2333688147)):
        with BuildLine():
            ThreePointArc((-6.0723027314, 1.2866666667), (-5.8883350241, 1.5143267632), (-5.608454097, 1.6))
            Line((-5.608454097, 1.6), (-6.0018016229, 1.6))
            ThreePointArc((-6.0018016229, 1.6), (-6.024390983, 1.4404845199), (-6.0723027314, 1.2866666667))
        make_face()
    extrude(amount=F7_T53_DEPTH)

    split(bisect_by=Plane.YZ.offset(-0.75), keep=Keep.BOTTOM)


with BuildPart() as f1_13:
    add(f1_12.part)

    # F7_t50: cut F7_tool51
    add(f7_tool51.part, mode=Mode.SUBTRACT)


with BuildPart() as f7_tool56:
    # F7_s57 → F7_t58 (new body)
    with BuildSketch(Plane.YZ.offset(-1.2333688147)):
        with BuildLine():
            ThreePointArc((-6.0723027314, 1.2866666667), (-5.8883350241, 1.5143267632), (-5.608454097, 1.6))
            Line((-5.608454097, 1.6), (-6.0018016229, 1.6))
            ThreePointArc((-6.0018016229, 1.6), (-6.024390983, 1.4404845199), (-6.0723027314, 1.2866666667))
        make_face()
    extrude(amount=F7_T58_DEPTH)

    split(bisect_by=Plane.YZ.offset(1.25), keep=Keep.TOP)


with BuildPart() as f1_14:
    add(f1_13.part)

    # F7_t55: cut F7_tool56
    add(f7_tool56.part, mode=Mode.SUBTRACT)


with BuildPart() as f7_tool61:
    # F7_s62 → F7_t63 (new body)
    with BuildSketch(Plane.YZ.offset(-2.7333688147)):
        with BuildLine():
            ThreePointArc((-6.0723027314, 1.2866666667), (-5.8883350241, 1.5143267632), (-5.608454097, 1.6))
            Line((-5.608454097, 1.6), (-6.0018016229, 1.6))
            ThreePointArc((-6.0018016229, 1.6), (-6.024390983, 1.4404845199), (-6.0723027314, 1.2866666667))
        make_face()
    extrude(amount=F7_T63_DEPTH)

    split(bisect_by=Plane.YZ.offset(-2.25), keep=Keep.BOTTOM)


with BuildPart() as f1_15:
    add(f1_14.part)

    # F7_t60: cut F7_tool61
    add(f7_tool61.part, mode=Mode.SUBTRACT)


with BuildPart() as f7_tool66:
    # F7_s67 → F7_t68 (new body)
    with BuildSketch(Plane.YZ.offset(-2.7333688147)):
        with BuildLine():
            ThreePointArc((-6.0723027314, 1.2866666667), (-5.8883350241, 1.5143267632), (-5.608454097, 1.6))
            Line((-5.608454097, 1.6), (-6.0018016229, 1.6))
            ThreePointArc((-6.0018016229, 1.6), (-6.024390983, 1.4404845199), (-6.0723027314, 1.2866666667))
        make_face()
    extrude(amount=F7_T68_DEPTH)

    split(bisect_by=Plane.YZ.offset(-0.25), keep=Keep.TOP)


with BuildPart() as f1_16:
    add(f1_15.part)

    # F7_t65: cut F7_tool66
    add(f7_tool66.part, mode=Mode.SUBTRACT)


with BuildPart() as f7_tool71:
    # F7_s72 → F7_t73 (new body)
    with BuildSketch(Plane.YZ.offset(-4.2333688147)):
        with BuildLine():
            ThreePointArc((-6.0723027314, 1.2866666667), (-5.8883350241, 1.5143267632), (-5.608454097, 1.6))
            Line((-5.608454097, 1.6), (-6.0018016229, 1.6))
            ThreePointArc((-6.0018016229, 1.6), (-6.024390983, 1.4404845199), (-6.0723027314, 1.2866666667))
        make_face()
    extrude(amount=F7_T73_DEPTH)

    split(bisect_by=Plane.YZ.offset(-1.75), keep=Keep.TOP)


with BuildPart() as f1_17:
    add(f1_16.part)

    # F7_t70: cut F7_tool71
    add(f7_tool71.part, mode=Mode.SUBTRACT)


solid = f1_17.part
